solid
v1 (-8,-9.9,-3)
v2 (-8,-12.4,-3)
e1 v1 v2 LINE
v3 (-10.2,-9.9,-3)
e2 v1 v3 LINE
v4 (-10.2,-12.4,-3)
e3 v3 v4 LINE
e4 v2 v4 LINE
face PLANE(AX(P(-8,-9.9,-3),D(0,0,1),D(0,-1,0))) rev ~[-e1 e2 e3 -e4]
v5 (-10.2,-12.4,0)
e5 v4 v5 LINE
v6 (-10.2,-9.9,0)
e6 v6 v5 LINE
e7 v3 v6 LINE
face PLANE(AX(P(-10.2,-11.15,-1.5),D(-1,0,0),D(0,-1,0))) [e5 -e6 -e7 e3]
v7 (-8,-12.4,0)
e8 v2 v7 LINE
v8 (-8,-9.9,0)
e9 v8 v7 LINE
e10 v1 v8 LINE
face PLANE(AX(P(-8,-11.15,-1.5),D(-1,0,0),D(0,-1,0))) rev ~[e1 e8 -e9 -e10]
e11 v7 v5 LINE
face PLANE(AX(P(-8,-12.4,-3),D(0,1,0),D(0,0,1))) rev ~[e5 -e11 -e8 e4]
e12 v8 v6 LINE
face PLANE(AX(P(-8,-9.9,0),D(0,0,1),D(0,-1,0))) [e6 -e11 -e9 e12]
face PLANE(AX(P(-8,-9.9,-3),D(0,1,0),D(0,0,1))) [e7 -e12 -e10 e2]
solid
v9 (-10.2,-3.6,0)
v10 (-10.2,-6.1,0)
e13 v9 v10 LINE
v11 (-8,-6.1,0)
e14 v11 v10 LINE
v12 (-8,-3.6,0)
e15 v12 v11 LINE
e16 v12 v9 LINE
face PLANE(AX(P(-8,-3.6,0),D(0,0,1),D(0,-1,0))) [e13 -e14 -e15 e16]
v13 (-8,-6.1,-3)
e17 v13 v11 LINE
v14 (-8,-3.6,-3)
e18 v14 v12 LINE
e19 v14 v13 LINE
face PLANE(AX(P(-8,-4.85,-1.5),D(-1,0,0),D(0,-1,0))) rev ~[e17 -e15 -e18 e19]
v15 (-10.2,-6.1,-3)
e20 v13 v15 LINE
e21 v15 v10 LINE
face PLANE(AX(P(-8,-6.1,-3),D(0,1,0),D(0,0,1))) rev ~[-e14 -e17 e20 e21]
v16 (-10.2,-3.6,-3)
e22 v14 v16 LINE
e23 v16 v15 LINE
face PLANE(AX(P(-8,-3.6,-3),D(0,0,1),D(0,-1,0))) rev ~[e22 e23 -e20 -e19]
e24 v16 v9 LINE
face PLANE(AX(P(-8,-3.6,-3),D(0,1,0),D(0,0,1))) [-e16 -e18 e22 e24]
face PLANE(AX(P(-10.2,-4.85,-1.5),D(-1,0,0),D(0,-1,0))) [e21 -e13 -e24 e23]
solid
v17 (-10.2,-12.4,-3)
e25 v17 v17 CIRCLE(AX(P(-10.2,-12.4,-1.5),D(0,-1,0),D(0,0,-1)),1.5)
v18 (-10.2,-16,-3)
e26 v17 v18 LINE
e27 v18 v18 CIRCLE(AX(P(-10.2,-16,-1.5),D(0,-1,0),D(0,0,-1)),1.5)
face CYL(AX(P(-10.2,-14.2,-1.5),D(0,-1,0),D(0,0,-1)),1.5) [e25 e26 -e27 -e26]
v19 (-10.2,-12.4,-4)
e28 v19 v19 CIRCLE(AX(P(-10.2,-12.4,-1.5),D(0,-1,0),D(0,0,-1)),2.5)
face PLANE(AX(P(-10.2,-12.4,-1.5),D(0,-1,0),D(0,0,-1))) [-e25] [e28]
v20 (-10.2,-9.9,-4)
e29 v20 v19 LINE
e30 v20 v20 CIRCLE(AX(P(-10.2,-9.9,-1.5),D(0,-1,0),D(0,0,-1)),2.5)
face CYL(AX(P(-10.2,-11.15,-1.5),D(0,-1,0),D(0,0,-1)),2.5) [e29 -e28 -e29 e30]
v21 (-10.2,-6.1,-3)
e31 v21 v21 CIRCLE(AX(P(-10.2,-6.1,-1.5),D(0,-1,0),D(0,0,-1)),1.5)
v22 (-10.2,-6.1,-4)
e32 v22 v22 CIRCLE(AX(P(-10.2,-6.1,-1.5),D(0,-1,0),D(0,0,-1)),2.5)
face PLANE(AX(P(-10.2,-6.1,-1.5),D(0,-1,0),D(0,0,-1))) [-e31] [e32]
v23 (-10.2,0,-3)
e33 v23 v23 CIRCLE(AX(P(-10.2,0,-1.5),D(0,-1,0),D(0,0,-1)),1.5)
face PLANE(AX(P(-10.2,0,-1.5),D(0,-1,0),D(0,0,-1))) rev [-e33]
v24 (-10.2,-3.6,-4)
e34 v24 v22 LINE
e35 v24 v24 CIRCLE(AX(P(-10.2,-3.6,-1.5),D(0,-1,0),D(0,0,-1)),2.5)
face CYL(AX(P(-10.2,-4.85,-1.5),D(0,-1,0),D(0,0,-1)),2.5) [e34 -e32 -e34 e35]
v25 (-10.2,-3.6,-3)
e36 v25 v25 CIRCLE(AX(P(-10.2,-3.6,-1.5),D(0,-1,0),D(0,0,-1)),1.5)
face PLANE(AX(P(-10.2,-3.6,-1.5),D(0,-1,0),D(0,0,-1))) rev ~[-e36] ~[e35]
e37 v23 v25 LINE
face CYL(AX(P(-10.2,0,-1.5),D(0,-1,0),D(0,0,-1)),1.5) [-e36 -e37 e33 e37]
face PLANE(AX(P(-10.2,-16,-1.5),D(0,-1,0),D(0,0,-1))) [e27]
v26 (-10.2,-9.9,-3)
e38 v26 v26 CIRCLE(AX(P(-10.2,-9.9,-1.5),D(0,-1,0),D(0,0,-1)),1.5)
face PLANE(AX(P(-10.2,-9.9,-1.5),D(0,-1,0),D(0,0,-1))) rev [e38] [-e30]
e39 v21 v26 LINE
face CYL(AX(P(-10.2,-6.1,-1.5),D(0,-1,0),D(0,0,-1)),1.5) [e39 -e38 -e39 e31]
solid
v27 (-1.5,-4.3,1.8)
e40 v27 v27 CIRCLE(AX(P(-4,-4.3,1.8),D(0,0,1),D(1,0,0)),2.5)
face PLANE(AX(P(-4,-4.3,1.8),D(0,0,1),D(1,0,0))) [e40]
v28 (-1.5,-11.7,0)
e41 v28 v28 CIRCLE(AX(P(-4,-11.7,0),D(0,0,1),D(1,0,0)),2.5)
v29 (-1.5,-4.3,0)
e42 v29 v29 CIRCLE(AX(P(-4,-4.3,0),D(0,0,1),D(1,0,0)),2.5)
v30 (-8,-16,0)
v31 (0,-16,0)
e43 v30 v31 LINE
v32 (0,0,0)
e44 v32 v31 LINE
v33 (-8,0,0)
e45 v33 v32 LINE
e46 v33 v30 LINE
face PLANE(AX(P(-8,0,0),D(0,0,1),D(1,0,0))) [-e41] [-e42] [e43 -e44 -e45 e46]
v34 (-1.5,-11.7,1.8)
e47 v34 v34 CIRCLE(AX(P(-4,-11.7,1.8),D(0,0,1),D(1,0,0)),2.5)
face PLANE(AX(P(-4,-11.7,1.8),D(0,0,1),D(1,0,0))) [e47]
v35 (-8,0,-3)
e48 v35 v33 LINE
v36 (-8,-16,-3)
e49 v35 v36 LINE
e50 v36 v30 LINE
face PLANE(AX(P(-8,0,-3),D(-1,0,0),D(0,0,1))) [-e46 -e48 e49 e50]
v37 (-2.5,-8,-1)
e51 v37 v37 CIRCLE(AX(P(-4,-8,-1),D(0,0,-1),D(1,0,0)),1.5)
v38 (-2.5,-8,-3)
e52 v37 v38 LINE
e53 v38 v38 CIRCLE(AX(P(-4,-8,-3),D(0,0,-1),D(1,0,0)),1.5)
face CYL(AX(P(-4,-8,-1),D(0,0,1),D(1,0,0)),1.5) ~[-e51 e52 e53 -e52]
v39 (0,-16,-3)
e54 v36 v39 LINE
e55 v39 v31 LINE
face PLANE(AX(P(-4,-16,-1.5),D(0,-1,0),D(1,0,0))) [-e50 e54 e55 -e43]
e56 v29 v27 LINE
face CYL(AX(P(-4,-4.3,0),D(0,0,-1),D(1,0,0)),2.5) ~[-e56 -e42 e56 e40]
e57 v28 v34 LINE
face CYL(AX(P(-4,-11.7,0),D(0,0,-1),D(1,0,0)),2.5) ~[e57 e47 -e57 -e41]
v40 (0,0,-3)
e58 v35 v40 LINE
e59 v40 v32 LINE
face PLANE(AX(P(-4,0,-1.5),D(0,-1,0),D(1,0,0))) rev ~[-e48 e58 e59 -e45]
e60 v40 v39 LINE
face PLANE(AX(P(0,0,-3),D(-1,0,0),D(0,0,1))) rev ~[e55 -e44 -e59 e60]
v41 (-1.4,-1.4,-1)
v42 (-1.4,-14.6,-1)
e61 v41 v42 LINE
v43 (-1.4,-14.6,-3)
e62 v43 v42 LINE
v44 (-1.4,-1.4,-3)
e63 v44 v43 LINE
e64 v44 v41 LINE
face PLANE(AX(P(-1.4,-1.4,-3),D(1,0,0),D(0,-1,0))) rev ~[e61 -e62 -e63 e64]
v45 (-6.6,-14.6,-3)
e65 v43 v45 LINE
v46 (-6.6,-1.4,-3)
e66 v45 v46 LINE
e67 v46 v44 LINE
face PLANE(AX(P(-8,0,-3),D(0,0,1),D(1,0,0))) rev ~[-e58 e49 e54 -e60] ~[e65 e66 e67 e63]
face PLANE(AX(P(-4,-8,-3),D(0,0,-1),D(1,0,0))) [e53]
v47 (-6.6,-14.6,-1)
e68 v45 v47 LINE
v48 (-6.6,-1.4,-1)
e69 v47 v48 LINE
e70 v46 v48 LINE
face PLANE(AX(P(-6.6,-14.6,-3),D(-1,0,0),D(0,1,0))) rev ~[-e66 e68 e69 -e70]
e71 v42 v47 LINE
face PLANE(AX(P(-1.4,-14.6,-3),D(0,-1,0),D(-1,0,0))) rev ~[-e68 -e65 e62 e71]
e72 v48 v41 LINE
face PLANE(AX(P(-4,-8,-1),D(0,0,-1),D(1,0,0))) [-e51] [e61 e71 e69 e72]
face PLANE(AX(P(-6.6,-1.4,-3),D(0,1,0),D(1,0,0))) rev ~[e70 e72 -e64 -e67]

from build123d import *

# Parameters (mm, degrees)
F0_W      = 8
F0_H      = 3
F1_DEPTH  = 16
F2_R      = 2.5
F3_DEPTH  = 1.8
F4_W      = 2.5
F4_H      = 3
F5_DEPTH  = 2.2
F6_W      = 2.5
F6_H      = 1
F6_W_2    = 3.6
F6_H_2    = 1.5
F9_DEPTH  = 2
F10_R     = 1.5
F11_DEPTH = 2


with BuildPart() as f1:
    # F0 (on Front) → F1 (new body)
    with BuildSketch(Plane.XZ):
        with Locations((-4, -1.5)):
            Rectangle(F0_W, F0_H)
    extrude(amount=F1_DEPTH)

    # F2 (on face) → F3 (join)
    with BuildSketch(Plane.XY):
        with Locations((-4, -4.3)):
            Circle(F2_R)
        with Locations((-4, -11.7)):
            Circle(F2_R)
    extrude(amount=F3_DEPTH)

    # F8 (on face) → F9 (cut)
    with BuildSketch(Plane(origin=(0, 0, -3), x_dir=(1, 0, 0), z_dir=(0, 0, -1))):
        Polygon((-6.6, 14.6), (-6.6, 8), (-6.6, 1.4), (-1.4, 1.4), (-1.4, 14.6), align=None)
    extrude(amount=-F9_DEPTH, mode=Mode.SUBTRACT)

    # F10 (on face) → F11 (join)
    with BuildSketch(Plane(origin=(0, 0, -1), x_dir=(1, 0, 0), z_dir=(0, 0, -1))):
        with Locations((-4, 8)):
            Circle(F10_R)
    extrude(amount=F11_DEPTH)


with BuildPart() as f5:
    # F4 (on face) → F5 (new body)
    with BuildSketch(Plane(origin=(-8, 0, 0), x_dir=(0, -1, 0), z_dir=(-1, 0, 0))):
        with Locations((4.85, -1.5)):
            Rectangle(F4_W, F4_H)
    extrude(amount=F5_DEPTH)


with BuildPart() as f5b:
    # F4 (on face) → F5, piece 2 (new body)
    with BuildSketch(Plane(origin=(-8, 0, 0), x_dir=(0, -1, 0), z_dir=(-1, 0, 0))):
        with Locations((11.15, -1.5)):
            Rectangle(F4_W, F4_H)
    extrude(amount=F5_DEPTH)


with BuildPart() as f7:
    # F6 (on face) → F7 (revolve)
    with BuildSketch(Plane(origin=(-10.2, 0, 0), x_dir=(0, -1, 0), z_dir=(-1, 0, 0))):
        with Locations((4.85, -3.5)):
            Rectangle(F6_W, F6_H)
        with Locations((11.15, -3.5)):
            Rectangle(F6_W, F6_H)
        with Locations((14.2, -2.25)):
            Rectangle(F6_W_2, F6_H_2)
        with Locations((11.15, -2.25)):
            Rectangle(F6_W, F6_H_2)
        Polygon((6.1, -3), (9.9, -3), (9.9, -1.5), (0, -1.5), (0, -3), (3.6, -3), align=None)
    revolve(axis=Axis((-10.2, -8, -1.5), (0, -1, 0)))


solid = Compound([f1.part, f5.part, f5b.part, f7.part])
